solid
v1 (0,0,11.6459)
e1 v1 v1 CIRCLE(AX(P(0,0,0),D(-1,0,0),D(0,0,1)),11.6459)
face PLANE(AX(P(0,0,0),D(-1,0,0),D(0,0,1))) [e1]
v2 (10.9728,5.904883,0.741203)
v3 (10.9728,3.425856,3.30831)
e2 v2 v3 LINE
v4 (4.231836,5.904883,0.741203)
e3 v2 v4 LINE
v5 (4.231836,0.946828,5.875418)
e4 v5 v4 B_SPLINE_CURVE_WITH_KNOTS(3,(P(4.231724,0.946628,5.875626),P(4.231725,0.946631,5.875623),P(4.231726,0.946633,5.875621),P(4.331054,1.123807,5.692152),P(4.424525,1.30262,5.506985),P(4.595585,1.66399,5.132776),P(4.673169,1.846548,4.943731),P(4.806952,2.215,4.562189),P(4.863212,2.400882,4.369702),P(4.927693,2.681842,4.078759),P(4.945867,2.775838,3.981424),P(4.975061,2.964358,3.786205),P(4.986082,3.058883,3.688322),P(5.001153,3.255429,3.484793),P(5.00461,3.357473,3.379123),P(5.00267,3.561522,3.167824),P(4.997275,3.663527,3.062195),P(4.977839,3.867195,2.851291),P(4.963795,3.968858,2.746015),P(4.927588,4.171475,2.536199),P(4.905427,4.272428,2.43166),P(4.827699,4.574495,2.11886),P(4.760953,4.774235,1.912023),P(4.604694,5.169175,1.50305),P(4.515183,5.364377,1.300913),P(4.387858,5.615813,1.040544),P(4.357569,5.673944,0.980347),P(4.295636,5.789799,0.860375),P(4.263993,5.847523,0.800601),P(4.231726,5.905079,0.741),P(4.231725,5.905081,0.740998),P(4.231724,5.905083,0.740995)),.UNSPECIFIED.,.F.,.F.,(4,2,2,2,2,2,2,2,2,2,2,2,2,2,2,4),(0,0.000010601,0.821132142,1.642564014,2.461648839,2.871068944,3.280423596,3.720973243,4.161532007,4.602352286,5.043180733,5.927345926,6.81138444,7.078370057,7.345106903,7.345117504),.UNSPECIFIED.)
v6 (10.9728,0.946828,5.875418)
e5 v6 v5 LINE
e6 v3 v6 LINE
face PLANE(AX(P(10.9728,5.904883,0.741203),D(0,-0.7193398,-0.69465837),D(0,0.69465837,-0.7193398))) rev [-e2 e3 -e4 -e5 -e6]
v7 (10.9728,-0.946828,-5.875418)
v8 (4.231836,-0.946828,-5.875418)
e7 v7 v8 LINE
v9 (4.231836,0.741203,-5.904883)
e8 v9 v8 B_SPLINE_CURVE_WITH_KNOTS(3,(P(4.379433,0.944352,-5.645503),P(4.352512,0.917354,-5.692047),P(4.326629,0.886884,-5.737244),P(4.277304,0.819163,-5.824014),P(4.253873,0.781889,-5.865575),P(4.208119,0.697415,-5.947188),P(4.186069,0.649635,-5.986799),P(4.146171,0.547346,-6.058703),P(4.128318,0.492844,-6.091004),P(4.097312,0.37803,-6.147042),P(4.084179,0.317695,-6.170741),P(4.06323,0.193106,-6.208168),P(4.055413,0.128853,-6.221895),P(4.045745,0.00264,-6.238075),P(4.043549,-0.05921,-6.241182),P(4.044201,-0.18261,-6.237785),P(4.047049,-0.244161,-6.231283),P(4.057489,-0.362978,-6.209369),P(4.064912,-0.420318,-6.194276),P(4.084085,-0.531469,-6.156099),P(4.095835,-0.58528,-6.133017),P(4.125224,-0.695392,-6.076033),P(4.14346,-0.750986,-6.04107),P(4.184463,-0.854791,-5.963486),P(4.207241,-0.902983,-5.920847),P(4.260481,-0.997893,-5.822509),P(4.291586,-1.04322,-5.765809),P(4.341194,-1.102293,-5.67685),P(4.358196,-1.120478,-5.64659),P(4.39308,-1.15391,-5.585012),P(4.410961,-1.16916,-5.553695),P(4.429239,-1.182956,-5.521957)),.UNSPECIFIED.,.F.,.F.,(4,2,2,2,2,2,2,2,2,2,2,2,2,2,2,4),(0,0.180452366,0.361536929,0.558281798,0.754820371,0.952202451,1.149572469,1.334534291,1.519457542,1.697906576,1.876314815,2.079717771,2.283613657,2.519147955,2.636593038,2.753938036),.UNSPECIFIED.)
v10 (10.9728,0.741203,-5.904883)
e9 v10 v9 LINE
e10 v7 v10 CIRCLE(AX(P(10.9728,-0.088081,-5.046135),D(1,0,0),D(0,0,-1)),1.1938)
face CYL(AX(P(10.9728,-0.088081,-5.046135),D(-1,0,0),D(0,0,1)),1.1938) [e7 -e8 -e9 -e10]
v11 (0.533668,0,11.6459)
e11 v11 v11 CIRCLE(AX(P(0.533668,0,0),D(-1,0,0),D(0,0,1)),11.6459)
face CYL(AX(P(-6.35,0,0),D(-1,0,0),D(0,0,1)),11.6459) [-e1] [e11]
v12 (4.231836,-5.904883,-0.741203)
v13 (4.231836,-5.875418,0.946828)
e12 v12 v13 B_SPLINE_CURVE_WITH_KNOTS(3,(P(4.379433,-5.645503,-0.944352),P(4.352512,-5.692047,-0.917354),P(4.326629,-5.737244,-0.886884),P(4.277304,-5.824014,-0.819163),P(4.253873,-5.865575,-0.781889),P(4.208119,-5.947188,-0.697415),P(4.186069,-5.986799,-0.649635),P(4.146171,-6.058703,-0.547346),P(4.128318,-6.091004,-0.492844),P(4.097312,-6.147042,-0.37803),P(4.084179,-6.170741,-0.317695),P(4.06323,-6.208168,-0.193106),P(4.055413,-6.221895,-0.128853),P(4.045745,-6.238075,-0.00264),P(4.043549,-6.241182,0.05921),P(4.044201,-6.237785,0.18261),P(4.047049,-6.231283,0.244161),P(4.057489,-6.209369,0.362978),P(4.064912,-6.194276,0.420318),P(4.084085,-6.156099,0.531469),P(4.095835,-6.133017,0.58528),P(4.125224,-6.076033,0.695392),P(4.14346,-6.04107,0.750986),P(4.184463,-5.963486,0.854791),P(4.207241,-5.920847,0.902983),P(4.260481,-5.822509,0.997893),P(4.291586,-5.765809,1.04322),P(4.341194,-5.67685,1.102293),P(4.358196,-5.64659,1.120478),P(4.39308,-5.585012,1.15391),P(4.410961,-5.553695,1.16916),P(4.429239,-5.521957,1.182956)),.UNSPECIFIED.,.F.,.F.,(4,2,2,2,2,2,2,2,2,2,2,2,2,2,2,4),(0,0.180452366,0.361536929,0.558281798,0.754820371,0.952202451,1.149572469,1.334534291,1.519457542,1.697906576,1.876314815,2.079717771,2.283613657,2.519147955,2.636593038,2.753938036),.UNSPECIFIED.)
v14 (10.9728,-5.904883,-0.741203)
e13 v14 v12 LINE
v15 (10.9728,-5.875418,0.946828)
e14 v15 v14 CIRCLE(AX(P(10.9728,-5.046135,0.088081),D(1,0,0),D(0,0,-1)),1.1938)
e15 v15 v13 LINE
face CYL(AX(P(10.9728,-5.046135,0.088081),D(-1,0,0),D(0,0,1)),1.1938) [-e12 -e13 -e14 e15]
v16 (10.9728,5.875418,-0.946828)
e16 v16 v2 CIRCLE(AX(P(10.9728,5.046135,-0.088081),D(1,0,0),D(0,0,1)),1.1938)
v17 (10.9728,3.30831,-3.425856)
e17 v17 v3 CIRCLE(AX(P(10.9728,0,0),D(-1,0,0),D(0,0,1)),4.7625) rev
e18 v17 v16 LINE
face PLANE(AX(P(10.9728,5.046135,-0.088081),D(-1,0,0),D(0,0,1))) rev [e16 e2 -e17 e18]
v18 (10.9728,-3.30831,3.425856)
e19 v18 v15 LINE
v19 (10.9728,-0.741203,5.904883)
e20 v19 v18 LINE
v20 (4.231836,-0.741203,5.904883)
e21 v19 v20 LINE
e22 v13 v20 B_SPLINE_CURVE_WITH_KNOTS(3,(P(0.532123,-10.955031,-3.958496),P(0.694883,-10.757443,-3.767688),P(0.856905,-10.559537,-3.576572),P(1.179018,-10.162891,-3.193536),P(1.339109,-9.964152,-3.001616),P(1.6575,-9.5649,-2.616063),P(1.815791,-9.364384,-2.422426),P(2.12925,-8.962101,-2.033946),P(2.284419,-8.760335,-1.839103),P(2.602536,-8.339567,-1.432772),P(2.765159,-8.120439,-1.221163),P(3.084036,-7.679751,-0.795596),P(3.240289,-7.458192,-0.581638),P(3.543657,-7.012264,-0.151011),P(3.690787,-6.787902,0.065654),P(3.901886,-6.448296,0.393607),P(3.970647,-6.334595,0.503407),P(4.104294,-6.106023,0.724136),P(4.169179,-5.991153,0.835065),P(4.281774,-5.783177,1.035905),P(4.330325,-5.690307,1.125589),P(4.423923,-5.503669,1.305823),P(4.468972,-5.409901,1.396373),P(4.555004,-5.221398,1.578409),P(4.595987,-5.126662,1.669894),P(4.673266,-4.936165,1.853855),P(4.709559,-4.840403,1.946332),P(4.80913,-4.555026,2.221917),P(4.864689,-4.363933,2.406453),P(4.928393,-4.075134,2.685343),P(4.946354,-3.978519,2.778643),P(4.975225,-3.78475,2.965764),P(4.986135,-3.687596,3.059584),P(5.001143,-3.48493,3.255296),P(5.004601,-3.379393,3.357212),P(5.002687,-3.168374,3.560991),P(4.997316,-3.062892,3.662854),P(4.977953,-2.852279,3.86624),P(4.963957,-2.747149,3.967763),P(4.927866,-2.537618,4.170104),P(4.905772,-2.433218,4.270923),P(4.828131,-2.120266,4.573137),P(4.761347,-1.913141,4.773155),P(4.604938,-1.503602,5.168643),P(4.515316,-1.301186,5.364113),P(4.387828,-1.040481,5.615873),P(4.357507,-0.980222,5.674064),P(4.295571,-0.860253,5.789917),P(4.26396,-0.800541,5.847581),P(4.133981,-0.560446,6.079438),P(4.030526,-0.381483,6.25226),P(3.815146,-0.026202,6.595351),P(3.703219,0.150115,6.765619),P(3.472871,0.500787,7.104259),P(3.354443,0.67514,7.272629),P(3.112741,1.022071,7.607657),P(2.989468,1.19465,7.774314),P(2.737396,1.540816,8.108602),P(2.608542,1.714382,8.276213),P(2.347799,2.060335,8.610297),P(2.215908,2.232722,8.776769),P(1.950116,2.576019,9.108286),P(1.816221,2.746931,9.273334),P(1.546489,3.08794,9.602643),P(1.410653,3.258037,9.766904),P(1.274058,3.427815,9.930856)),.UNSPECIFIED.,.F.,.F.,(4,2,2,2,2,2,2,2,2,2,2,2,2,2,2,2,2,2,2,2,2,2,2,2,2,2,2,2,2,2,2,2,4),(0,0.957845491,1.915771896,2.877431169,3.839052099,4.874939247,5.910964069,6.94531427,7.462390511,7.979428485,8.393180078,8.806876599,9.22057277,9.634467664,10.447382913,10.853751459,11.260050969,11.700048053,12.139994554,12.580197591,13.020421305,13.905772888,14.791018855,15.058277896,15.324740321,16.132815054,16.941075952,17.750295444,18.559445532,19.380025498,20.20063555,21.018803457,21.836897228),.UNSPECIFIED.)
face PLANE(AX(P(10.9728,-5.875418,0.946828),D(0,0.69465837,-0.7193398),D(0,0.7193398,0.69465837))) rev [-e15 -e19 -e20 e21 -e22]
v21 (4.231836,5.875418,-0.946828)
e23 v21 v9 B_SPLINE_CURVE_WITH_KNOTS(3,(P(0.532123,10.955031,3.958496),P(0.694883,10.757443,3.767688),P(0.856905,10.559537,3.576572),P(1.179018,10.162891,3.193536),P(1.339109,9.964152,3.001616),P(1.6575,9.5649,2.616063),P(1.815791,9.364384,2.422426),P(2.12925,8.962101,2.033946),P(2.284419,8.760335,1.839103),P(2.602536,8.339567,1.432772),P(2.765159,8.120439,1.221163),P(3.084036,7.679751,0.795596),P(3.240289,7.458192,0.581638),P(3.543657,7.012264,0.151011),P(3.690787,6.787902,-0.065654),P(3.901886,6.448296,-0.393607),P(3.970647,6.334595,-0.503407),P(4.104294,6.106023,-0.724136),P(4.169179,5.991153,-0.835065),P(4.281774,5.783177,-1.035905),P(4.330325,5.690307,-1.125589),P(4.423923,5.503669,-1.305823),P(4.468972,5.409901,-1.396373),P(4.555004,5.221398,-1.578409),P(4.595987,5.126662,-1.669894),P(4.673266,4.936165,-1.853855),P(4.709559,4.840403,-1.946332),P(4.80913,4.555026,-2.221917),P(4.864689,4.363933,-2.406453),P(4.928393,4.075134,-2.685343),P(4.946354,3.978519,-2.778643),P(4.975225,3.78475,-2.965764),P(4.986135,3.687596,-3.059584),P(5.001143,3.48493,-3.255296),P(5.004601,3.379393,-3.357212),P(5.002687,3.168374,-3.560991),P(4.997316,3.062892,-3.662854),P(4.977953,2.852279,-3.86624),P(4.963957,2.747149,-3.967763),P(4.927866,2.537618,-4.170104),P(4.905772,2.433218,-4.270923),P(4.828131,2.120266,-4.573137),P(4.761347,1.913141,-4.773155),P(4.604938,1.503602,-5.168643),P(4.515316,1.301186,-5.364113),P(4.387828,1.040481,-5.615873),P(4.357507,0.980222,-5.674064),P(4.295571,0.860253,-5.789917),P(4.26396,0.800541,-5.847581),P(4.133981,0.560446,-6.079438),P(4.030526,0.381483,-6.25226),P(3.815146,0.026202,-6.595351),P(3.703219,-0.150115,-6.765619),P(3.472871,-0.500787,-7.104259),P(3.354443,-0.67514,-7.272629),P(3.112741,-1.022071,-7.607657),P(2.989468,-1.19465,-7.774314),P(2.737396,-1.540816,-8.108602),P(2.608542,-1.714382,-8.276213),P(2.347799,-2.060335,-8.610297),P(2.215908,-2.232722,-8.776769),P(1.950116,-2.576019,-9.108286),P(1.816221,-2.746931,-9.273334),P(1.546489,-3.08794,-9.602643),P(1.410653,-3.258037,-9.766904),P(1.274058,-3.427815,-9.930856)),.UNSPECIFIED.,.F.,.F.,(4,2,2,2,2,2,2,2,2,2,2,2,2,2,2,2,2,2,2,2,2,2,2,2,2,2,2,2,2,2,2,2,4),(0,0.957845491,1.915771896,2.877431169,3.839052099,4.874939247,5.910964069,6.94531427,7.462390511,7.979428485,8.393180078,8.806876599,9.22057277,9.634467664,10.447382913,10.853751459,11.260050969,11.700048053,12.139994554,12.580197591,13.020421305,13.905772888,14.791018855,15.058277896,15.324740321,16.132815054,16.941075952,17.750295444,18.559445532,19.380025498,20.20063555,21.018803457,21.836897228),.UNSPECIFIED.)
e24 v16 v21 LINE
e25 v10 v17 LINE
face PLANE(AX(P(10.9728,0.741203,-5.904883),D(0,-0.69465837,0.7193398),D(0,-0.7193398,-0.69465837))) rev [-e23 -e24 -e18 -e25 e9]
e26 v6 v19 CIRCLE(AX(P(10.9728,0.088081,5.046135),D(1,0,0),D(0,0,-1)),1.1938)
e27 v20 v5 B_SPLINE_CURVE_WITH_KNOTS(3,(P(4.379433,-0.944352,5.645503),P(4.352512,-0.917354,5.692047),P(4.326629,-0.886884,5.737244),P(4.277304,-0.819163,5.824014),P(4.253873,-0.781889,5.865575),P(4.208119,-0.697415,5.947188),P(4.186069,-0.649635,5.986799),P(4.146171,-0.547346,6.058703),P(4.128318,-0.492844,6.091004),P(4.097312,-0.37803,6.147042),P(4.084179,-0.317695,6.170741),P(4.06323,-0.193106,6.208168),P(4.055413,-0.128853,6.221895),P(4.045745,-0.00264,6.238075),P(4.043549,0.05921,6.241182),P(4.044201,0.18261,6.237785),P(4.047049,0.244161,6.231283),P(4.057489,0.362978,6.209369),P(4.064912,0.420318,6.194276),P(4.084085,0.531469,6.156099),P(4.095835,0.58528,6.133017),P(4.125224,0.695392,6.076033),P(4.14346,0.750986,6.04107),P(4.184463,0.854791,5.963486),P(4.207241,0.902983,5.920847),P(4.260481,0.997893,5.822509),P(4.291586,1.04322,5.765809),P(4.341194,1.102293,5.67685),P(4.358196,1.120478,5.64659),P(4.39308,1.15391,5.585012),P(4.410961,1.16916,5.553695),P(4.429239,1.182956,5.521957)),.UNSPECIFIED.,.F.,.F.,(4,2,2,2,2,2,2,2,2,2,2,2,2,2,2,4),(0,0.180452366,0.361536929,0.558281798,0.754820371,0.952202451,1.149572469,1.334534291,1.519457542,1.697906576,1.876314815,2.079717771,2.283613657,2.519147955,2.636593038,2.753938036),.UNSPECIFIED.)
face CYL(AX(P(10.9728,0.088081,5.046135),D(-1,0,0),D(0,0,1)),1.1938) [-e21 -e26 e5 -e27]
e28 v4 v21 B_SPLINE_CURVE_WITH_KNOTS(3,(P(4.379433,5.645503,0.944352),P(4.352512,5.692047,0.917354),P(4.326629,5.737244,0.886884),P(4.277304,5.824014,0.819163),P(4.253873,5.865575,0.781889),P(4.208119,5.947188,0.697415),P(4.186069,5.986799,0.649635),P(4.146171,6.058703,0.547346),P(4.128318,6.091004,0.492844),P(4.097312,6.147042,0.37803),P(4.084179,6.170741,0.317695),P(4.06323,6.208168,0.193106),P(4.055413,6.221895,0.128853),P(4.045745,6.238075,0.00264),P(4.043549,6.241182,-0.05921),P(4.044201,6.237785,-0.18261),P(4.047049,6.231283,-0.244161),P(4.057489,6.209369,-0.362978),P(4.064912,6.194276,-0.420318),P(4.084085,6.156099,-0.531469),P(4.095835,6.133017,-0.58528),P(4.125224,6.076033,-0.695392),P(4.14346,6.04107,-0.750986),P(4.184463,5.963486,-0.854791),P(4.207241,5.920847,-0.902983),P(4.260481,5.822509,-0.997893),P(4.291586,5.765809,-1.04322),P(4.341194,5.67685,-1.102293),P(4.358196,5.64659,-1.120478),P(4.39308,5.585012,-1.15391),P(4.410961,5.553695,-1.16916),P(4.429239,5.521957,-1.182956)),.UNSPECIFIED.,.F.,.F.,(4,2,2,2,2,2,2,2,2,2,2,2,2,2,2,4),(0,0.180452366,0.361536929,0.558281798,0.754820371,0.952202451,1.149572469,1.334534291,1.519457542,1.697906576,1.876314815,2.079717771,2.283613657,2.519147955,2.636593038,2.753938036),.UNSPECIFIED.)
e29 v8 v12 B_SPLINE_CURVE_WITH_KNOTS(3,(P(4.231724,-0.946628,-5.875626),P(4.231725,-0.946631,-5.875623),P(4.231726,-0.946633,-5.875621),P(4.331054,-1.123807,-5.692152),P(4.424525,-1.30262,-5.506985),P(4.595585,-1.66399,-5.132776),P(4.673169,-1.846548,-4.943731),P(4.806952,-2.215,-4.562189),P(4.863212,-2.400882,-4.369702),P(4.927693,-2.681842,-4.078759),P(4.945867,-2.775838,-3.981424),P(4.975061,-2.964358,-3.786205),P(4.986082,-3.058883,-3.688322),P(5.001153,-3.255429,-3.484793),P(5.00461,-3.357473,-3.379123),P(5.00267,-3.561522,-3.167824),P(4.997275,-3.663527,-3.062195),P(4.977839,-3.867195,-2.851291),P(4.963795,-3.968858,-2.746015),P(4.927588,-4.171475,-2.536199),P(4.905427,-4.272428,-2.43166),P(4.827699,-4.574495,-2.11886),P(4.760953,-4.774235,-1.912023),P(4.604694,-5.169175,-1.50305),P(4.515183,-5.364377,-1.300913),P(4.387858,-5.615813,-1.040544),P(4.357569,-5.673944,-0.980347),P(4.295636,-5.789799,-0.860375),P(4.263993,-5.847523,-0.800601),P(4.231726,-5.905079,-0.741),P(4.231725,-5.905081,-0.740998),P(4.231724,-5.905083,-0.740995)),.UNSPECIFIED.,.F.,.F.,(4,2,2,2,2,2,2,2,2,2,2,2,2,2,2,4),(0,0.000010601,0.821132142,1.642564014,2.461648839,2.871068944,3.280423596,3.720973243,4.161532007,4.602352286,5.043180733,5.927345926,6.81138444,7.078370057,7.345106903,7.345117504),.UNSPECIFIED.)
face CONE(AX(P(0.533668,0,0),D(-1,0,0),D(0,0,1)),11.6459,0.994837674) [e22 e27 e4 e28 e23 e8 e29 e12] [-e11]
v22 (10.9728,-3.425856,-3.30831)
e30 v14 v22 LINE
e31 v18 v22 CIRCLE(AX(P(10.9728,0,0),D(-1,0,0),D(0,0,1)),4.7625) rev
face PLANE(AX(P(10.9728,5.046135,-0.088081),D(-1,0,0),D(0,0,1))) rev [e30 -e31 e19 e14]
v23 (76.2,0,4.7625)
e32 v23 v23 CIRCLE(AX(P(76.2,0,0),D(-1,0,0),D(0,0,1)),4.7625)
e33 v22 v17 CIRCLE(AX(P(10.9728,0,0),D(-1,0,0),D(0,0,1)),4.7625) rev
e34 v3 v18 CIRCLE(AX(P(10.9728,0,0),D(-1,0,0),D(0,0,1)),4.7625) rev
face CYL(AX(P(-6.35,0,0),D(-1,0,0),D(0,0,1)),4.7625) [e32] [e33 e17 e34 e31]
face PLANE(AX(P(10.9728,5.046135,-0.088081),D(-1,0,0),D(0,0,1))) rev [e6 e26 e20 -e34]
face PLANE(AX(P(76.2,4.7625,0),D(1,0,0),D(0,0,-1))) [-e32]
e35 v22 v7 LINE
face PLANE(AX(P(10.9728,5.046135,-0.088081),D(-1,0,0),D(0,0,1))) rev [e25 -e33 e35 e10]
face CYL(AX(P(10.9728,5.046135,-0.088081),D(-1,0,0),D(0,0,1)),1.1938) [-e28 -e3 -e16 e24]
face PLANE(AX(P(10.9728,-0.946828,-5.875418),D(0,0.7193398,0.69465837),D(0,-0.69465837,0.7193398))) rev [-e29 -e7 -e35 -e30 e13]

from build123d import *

# Parameters (mm, degrees)
NECK_DEPTH = 10.9728


# Read off the part's stored shape, not the designer's step: Cut-Revolve1
with BuildPart() as part:
    # Cut-Revolve1 outline → Cut-Revolve1 (revolve)
    with BuildSketch(Plane.YX):
        Polygon((0, 76.2), (0, 0), (11.6459, 0), (11.6459, 0.533667773), (4.7625, 5.0038), (4.7625, 76.2), align=None)
    revolve(axis=Axis((0, 0, 0), (1, 0, 0)))

    # Sketch2 → Neck (add)
    with BuildSketch(Plane(origin=(0, 0, 0), x_dir=(0, 0.6946583704589985, -0.7193398003386501), z_dir=(1, 0, 0))):
        with BuildLine():
            Line((3.5687, -4.7625), (-3.5687, -4.7625))
            ThreePointArc((-3.5687, -4.7625), (-4.412844075, -4.412844075), (-4.7625, -3.5687))
            Line((-4.7625, -3.5687), (-4.7625, 3.5687))
            ThreePointArc((-4.7625, 3.5687), (-4.412844075, 4.412844075), (-3.5687, 4.7625))
            Line((-3.5687, 4.7625), (3.5687, 4.7625))
            ThreePointArc((3.5687, 4.7625), (4.412844075, 4.412844075), (4.7625, 3.5687))
            Line((4.7625, 3.5687), (4.7625, -3.5687))
            ThreePointArc((4.7625, -3.5687), (4.412844075, -4.412844075), (3.5687, -4.7625))
        make_face()
    extrude(amount=NECK_DEPTH)


solid = part.part
